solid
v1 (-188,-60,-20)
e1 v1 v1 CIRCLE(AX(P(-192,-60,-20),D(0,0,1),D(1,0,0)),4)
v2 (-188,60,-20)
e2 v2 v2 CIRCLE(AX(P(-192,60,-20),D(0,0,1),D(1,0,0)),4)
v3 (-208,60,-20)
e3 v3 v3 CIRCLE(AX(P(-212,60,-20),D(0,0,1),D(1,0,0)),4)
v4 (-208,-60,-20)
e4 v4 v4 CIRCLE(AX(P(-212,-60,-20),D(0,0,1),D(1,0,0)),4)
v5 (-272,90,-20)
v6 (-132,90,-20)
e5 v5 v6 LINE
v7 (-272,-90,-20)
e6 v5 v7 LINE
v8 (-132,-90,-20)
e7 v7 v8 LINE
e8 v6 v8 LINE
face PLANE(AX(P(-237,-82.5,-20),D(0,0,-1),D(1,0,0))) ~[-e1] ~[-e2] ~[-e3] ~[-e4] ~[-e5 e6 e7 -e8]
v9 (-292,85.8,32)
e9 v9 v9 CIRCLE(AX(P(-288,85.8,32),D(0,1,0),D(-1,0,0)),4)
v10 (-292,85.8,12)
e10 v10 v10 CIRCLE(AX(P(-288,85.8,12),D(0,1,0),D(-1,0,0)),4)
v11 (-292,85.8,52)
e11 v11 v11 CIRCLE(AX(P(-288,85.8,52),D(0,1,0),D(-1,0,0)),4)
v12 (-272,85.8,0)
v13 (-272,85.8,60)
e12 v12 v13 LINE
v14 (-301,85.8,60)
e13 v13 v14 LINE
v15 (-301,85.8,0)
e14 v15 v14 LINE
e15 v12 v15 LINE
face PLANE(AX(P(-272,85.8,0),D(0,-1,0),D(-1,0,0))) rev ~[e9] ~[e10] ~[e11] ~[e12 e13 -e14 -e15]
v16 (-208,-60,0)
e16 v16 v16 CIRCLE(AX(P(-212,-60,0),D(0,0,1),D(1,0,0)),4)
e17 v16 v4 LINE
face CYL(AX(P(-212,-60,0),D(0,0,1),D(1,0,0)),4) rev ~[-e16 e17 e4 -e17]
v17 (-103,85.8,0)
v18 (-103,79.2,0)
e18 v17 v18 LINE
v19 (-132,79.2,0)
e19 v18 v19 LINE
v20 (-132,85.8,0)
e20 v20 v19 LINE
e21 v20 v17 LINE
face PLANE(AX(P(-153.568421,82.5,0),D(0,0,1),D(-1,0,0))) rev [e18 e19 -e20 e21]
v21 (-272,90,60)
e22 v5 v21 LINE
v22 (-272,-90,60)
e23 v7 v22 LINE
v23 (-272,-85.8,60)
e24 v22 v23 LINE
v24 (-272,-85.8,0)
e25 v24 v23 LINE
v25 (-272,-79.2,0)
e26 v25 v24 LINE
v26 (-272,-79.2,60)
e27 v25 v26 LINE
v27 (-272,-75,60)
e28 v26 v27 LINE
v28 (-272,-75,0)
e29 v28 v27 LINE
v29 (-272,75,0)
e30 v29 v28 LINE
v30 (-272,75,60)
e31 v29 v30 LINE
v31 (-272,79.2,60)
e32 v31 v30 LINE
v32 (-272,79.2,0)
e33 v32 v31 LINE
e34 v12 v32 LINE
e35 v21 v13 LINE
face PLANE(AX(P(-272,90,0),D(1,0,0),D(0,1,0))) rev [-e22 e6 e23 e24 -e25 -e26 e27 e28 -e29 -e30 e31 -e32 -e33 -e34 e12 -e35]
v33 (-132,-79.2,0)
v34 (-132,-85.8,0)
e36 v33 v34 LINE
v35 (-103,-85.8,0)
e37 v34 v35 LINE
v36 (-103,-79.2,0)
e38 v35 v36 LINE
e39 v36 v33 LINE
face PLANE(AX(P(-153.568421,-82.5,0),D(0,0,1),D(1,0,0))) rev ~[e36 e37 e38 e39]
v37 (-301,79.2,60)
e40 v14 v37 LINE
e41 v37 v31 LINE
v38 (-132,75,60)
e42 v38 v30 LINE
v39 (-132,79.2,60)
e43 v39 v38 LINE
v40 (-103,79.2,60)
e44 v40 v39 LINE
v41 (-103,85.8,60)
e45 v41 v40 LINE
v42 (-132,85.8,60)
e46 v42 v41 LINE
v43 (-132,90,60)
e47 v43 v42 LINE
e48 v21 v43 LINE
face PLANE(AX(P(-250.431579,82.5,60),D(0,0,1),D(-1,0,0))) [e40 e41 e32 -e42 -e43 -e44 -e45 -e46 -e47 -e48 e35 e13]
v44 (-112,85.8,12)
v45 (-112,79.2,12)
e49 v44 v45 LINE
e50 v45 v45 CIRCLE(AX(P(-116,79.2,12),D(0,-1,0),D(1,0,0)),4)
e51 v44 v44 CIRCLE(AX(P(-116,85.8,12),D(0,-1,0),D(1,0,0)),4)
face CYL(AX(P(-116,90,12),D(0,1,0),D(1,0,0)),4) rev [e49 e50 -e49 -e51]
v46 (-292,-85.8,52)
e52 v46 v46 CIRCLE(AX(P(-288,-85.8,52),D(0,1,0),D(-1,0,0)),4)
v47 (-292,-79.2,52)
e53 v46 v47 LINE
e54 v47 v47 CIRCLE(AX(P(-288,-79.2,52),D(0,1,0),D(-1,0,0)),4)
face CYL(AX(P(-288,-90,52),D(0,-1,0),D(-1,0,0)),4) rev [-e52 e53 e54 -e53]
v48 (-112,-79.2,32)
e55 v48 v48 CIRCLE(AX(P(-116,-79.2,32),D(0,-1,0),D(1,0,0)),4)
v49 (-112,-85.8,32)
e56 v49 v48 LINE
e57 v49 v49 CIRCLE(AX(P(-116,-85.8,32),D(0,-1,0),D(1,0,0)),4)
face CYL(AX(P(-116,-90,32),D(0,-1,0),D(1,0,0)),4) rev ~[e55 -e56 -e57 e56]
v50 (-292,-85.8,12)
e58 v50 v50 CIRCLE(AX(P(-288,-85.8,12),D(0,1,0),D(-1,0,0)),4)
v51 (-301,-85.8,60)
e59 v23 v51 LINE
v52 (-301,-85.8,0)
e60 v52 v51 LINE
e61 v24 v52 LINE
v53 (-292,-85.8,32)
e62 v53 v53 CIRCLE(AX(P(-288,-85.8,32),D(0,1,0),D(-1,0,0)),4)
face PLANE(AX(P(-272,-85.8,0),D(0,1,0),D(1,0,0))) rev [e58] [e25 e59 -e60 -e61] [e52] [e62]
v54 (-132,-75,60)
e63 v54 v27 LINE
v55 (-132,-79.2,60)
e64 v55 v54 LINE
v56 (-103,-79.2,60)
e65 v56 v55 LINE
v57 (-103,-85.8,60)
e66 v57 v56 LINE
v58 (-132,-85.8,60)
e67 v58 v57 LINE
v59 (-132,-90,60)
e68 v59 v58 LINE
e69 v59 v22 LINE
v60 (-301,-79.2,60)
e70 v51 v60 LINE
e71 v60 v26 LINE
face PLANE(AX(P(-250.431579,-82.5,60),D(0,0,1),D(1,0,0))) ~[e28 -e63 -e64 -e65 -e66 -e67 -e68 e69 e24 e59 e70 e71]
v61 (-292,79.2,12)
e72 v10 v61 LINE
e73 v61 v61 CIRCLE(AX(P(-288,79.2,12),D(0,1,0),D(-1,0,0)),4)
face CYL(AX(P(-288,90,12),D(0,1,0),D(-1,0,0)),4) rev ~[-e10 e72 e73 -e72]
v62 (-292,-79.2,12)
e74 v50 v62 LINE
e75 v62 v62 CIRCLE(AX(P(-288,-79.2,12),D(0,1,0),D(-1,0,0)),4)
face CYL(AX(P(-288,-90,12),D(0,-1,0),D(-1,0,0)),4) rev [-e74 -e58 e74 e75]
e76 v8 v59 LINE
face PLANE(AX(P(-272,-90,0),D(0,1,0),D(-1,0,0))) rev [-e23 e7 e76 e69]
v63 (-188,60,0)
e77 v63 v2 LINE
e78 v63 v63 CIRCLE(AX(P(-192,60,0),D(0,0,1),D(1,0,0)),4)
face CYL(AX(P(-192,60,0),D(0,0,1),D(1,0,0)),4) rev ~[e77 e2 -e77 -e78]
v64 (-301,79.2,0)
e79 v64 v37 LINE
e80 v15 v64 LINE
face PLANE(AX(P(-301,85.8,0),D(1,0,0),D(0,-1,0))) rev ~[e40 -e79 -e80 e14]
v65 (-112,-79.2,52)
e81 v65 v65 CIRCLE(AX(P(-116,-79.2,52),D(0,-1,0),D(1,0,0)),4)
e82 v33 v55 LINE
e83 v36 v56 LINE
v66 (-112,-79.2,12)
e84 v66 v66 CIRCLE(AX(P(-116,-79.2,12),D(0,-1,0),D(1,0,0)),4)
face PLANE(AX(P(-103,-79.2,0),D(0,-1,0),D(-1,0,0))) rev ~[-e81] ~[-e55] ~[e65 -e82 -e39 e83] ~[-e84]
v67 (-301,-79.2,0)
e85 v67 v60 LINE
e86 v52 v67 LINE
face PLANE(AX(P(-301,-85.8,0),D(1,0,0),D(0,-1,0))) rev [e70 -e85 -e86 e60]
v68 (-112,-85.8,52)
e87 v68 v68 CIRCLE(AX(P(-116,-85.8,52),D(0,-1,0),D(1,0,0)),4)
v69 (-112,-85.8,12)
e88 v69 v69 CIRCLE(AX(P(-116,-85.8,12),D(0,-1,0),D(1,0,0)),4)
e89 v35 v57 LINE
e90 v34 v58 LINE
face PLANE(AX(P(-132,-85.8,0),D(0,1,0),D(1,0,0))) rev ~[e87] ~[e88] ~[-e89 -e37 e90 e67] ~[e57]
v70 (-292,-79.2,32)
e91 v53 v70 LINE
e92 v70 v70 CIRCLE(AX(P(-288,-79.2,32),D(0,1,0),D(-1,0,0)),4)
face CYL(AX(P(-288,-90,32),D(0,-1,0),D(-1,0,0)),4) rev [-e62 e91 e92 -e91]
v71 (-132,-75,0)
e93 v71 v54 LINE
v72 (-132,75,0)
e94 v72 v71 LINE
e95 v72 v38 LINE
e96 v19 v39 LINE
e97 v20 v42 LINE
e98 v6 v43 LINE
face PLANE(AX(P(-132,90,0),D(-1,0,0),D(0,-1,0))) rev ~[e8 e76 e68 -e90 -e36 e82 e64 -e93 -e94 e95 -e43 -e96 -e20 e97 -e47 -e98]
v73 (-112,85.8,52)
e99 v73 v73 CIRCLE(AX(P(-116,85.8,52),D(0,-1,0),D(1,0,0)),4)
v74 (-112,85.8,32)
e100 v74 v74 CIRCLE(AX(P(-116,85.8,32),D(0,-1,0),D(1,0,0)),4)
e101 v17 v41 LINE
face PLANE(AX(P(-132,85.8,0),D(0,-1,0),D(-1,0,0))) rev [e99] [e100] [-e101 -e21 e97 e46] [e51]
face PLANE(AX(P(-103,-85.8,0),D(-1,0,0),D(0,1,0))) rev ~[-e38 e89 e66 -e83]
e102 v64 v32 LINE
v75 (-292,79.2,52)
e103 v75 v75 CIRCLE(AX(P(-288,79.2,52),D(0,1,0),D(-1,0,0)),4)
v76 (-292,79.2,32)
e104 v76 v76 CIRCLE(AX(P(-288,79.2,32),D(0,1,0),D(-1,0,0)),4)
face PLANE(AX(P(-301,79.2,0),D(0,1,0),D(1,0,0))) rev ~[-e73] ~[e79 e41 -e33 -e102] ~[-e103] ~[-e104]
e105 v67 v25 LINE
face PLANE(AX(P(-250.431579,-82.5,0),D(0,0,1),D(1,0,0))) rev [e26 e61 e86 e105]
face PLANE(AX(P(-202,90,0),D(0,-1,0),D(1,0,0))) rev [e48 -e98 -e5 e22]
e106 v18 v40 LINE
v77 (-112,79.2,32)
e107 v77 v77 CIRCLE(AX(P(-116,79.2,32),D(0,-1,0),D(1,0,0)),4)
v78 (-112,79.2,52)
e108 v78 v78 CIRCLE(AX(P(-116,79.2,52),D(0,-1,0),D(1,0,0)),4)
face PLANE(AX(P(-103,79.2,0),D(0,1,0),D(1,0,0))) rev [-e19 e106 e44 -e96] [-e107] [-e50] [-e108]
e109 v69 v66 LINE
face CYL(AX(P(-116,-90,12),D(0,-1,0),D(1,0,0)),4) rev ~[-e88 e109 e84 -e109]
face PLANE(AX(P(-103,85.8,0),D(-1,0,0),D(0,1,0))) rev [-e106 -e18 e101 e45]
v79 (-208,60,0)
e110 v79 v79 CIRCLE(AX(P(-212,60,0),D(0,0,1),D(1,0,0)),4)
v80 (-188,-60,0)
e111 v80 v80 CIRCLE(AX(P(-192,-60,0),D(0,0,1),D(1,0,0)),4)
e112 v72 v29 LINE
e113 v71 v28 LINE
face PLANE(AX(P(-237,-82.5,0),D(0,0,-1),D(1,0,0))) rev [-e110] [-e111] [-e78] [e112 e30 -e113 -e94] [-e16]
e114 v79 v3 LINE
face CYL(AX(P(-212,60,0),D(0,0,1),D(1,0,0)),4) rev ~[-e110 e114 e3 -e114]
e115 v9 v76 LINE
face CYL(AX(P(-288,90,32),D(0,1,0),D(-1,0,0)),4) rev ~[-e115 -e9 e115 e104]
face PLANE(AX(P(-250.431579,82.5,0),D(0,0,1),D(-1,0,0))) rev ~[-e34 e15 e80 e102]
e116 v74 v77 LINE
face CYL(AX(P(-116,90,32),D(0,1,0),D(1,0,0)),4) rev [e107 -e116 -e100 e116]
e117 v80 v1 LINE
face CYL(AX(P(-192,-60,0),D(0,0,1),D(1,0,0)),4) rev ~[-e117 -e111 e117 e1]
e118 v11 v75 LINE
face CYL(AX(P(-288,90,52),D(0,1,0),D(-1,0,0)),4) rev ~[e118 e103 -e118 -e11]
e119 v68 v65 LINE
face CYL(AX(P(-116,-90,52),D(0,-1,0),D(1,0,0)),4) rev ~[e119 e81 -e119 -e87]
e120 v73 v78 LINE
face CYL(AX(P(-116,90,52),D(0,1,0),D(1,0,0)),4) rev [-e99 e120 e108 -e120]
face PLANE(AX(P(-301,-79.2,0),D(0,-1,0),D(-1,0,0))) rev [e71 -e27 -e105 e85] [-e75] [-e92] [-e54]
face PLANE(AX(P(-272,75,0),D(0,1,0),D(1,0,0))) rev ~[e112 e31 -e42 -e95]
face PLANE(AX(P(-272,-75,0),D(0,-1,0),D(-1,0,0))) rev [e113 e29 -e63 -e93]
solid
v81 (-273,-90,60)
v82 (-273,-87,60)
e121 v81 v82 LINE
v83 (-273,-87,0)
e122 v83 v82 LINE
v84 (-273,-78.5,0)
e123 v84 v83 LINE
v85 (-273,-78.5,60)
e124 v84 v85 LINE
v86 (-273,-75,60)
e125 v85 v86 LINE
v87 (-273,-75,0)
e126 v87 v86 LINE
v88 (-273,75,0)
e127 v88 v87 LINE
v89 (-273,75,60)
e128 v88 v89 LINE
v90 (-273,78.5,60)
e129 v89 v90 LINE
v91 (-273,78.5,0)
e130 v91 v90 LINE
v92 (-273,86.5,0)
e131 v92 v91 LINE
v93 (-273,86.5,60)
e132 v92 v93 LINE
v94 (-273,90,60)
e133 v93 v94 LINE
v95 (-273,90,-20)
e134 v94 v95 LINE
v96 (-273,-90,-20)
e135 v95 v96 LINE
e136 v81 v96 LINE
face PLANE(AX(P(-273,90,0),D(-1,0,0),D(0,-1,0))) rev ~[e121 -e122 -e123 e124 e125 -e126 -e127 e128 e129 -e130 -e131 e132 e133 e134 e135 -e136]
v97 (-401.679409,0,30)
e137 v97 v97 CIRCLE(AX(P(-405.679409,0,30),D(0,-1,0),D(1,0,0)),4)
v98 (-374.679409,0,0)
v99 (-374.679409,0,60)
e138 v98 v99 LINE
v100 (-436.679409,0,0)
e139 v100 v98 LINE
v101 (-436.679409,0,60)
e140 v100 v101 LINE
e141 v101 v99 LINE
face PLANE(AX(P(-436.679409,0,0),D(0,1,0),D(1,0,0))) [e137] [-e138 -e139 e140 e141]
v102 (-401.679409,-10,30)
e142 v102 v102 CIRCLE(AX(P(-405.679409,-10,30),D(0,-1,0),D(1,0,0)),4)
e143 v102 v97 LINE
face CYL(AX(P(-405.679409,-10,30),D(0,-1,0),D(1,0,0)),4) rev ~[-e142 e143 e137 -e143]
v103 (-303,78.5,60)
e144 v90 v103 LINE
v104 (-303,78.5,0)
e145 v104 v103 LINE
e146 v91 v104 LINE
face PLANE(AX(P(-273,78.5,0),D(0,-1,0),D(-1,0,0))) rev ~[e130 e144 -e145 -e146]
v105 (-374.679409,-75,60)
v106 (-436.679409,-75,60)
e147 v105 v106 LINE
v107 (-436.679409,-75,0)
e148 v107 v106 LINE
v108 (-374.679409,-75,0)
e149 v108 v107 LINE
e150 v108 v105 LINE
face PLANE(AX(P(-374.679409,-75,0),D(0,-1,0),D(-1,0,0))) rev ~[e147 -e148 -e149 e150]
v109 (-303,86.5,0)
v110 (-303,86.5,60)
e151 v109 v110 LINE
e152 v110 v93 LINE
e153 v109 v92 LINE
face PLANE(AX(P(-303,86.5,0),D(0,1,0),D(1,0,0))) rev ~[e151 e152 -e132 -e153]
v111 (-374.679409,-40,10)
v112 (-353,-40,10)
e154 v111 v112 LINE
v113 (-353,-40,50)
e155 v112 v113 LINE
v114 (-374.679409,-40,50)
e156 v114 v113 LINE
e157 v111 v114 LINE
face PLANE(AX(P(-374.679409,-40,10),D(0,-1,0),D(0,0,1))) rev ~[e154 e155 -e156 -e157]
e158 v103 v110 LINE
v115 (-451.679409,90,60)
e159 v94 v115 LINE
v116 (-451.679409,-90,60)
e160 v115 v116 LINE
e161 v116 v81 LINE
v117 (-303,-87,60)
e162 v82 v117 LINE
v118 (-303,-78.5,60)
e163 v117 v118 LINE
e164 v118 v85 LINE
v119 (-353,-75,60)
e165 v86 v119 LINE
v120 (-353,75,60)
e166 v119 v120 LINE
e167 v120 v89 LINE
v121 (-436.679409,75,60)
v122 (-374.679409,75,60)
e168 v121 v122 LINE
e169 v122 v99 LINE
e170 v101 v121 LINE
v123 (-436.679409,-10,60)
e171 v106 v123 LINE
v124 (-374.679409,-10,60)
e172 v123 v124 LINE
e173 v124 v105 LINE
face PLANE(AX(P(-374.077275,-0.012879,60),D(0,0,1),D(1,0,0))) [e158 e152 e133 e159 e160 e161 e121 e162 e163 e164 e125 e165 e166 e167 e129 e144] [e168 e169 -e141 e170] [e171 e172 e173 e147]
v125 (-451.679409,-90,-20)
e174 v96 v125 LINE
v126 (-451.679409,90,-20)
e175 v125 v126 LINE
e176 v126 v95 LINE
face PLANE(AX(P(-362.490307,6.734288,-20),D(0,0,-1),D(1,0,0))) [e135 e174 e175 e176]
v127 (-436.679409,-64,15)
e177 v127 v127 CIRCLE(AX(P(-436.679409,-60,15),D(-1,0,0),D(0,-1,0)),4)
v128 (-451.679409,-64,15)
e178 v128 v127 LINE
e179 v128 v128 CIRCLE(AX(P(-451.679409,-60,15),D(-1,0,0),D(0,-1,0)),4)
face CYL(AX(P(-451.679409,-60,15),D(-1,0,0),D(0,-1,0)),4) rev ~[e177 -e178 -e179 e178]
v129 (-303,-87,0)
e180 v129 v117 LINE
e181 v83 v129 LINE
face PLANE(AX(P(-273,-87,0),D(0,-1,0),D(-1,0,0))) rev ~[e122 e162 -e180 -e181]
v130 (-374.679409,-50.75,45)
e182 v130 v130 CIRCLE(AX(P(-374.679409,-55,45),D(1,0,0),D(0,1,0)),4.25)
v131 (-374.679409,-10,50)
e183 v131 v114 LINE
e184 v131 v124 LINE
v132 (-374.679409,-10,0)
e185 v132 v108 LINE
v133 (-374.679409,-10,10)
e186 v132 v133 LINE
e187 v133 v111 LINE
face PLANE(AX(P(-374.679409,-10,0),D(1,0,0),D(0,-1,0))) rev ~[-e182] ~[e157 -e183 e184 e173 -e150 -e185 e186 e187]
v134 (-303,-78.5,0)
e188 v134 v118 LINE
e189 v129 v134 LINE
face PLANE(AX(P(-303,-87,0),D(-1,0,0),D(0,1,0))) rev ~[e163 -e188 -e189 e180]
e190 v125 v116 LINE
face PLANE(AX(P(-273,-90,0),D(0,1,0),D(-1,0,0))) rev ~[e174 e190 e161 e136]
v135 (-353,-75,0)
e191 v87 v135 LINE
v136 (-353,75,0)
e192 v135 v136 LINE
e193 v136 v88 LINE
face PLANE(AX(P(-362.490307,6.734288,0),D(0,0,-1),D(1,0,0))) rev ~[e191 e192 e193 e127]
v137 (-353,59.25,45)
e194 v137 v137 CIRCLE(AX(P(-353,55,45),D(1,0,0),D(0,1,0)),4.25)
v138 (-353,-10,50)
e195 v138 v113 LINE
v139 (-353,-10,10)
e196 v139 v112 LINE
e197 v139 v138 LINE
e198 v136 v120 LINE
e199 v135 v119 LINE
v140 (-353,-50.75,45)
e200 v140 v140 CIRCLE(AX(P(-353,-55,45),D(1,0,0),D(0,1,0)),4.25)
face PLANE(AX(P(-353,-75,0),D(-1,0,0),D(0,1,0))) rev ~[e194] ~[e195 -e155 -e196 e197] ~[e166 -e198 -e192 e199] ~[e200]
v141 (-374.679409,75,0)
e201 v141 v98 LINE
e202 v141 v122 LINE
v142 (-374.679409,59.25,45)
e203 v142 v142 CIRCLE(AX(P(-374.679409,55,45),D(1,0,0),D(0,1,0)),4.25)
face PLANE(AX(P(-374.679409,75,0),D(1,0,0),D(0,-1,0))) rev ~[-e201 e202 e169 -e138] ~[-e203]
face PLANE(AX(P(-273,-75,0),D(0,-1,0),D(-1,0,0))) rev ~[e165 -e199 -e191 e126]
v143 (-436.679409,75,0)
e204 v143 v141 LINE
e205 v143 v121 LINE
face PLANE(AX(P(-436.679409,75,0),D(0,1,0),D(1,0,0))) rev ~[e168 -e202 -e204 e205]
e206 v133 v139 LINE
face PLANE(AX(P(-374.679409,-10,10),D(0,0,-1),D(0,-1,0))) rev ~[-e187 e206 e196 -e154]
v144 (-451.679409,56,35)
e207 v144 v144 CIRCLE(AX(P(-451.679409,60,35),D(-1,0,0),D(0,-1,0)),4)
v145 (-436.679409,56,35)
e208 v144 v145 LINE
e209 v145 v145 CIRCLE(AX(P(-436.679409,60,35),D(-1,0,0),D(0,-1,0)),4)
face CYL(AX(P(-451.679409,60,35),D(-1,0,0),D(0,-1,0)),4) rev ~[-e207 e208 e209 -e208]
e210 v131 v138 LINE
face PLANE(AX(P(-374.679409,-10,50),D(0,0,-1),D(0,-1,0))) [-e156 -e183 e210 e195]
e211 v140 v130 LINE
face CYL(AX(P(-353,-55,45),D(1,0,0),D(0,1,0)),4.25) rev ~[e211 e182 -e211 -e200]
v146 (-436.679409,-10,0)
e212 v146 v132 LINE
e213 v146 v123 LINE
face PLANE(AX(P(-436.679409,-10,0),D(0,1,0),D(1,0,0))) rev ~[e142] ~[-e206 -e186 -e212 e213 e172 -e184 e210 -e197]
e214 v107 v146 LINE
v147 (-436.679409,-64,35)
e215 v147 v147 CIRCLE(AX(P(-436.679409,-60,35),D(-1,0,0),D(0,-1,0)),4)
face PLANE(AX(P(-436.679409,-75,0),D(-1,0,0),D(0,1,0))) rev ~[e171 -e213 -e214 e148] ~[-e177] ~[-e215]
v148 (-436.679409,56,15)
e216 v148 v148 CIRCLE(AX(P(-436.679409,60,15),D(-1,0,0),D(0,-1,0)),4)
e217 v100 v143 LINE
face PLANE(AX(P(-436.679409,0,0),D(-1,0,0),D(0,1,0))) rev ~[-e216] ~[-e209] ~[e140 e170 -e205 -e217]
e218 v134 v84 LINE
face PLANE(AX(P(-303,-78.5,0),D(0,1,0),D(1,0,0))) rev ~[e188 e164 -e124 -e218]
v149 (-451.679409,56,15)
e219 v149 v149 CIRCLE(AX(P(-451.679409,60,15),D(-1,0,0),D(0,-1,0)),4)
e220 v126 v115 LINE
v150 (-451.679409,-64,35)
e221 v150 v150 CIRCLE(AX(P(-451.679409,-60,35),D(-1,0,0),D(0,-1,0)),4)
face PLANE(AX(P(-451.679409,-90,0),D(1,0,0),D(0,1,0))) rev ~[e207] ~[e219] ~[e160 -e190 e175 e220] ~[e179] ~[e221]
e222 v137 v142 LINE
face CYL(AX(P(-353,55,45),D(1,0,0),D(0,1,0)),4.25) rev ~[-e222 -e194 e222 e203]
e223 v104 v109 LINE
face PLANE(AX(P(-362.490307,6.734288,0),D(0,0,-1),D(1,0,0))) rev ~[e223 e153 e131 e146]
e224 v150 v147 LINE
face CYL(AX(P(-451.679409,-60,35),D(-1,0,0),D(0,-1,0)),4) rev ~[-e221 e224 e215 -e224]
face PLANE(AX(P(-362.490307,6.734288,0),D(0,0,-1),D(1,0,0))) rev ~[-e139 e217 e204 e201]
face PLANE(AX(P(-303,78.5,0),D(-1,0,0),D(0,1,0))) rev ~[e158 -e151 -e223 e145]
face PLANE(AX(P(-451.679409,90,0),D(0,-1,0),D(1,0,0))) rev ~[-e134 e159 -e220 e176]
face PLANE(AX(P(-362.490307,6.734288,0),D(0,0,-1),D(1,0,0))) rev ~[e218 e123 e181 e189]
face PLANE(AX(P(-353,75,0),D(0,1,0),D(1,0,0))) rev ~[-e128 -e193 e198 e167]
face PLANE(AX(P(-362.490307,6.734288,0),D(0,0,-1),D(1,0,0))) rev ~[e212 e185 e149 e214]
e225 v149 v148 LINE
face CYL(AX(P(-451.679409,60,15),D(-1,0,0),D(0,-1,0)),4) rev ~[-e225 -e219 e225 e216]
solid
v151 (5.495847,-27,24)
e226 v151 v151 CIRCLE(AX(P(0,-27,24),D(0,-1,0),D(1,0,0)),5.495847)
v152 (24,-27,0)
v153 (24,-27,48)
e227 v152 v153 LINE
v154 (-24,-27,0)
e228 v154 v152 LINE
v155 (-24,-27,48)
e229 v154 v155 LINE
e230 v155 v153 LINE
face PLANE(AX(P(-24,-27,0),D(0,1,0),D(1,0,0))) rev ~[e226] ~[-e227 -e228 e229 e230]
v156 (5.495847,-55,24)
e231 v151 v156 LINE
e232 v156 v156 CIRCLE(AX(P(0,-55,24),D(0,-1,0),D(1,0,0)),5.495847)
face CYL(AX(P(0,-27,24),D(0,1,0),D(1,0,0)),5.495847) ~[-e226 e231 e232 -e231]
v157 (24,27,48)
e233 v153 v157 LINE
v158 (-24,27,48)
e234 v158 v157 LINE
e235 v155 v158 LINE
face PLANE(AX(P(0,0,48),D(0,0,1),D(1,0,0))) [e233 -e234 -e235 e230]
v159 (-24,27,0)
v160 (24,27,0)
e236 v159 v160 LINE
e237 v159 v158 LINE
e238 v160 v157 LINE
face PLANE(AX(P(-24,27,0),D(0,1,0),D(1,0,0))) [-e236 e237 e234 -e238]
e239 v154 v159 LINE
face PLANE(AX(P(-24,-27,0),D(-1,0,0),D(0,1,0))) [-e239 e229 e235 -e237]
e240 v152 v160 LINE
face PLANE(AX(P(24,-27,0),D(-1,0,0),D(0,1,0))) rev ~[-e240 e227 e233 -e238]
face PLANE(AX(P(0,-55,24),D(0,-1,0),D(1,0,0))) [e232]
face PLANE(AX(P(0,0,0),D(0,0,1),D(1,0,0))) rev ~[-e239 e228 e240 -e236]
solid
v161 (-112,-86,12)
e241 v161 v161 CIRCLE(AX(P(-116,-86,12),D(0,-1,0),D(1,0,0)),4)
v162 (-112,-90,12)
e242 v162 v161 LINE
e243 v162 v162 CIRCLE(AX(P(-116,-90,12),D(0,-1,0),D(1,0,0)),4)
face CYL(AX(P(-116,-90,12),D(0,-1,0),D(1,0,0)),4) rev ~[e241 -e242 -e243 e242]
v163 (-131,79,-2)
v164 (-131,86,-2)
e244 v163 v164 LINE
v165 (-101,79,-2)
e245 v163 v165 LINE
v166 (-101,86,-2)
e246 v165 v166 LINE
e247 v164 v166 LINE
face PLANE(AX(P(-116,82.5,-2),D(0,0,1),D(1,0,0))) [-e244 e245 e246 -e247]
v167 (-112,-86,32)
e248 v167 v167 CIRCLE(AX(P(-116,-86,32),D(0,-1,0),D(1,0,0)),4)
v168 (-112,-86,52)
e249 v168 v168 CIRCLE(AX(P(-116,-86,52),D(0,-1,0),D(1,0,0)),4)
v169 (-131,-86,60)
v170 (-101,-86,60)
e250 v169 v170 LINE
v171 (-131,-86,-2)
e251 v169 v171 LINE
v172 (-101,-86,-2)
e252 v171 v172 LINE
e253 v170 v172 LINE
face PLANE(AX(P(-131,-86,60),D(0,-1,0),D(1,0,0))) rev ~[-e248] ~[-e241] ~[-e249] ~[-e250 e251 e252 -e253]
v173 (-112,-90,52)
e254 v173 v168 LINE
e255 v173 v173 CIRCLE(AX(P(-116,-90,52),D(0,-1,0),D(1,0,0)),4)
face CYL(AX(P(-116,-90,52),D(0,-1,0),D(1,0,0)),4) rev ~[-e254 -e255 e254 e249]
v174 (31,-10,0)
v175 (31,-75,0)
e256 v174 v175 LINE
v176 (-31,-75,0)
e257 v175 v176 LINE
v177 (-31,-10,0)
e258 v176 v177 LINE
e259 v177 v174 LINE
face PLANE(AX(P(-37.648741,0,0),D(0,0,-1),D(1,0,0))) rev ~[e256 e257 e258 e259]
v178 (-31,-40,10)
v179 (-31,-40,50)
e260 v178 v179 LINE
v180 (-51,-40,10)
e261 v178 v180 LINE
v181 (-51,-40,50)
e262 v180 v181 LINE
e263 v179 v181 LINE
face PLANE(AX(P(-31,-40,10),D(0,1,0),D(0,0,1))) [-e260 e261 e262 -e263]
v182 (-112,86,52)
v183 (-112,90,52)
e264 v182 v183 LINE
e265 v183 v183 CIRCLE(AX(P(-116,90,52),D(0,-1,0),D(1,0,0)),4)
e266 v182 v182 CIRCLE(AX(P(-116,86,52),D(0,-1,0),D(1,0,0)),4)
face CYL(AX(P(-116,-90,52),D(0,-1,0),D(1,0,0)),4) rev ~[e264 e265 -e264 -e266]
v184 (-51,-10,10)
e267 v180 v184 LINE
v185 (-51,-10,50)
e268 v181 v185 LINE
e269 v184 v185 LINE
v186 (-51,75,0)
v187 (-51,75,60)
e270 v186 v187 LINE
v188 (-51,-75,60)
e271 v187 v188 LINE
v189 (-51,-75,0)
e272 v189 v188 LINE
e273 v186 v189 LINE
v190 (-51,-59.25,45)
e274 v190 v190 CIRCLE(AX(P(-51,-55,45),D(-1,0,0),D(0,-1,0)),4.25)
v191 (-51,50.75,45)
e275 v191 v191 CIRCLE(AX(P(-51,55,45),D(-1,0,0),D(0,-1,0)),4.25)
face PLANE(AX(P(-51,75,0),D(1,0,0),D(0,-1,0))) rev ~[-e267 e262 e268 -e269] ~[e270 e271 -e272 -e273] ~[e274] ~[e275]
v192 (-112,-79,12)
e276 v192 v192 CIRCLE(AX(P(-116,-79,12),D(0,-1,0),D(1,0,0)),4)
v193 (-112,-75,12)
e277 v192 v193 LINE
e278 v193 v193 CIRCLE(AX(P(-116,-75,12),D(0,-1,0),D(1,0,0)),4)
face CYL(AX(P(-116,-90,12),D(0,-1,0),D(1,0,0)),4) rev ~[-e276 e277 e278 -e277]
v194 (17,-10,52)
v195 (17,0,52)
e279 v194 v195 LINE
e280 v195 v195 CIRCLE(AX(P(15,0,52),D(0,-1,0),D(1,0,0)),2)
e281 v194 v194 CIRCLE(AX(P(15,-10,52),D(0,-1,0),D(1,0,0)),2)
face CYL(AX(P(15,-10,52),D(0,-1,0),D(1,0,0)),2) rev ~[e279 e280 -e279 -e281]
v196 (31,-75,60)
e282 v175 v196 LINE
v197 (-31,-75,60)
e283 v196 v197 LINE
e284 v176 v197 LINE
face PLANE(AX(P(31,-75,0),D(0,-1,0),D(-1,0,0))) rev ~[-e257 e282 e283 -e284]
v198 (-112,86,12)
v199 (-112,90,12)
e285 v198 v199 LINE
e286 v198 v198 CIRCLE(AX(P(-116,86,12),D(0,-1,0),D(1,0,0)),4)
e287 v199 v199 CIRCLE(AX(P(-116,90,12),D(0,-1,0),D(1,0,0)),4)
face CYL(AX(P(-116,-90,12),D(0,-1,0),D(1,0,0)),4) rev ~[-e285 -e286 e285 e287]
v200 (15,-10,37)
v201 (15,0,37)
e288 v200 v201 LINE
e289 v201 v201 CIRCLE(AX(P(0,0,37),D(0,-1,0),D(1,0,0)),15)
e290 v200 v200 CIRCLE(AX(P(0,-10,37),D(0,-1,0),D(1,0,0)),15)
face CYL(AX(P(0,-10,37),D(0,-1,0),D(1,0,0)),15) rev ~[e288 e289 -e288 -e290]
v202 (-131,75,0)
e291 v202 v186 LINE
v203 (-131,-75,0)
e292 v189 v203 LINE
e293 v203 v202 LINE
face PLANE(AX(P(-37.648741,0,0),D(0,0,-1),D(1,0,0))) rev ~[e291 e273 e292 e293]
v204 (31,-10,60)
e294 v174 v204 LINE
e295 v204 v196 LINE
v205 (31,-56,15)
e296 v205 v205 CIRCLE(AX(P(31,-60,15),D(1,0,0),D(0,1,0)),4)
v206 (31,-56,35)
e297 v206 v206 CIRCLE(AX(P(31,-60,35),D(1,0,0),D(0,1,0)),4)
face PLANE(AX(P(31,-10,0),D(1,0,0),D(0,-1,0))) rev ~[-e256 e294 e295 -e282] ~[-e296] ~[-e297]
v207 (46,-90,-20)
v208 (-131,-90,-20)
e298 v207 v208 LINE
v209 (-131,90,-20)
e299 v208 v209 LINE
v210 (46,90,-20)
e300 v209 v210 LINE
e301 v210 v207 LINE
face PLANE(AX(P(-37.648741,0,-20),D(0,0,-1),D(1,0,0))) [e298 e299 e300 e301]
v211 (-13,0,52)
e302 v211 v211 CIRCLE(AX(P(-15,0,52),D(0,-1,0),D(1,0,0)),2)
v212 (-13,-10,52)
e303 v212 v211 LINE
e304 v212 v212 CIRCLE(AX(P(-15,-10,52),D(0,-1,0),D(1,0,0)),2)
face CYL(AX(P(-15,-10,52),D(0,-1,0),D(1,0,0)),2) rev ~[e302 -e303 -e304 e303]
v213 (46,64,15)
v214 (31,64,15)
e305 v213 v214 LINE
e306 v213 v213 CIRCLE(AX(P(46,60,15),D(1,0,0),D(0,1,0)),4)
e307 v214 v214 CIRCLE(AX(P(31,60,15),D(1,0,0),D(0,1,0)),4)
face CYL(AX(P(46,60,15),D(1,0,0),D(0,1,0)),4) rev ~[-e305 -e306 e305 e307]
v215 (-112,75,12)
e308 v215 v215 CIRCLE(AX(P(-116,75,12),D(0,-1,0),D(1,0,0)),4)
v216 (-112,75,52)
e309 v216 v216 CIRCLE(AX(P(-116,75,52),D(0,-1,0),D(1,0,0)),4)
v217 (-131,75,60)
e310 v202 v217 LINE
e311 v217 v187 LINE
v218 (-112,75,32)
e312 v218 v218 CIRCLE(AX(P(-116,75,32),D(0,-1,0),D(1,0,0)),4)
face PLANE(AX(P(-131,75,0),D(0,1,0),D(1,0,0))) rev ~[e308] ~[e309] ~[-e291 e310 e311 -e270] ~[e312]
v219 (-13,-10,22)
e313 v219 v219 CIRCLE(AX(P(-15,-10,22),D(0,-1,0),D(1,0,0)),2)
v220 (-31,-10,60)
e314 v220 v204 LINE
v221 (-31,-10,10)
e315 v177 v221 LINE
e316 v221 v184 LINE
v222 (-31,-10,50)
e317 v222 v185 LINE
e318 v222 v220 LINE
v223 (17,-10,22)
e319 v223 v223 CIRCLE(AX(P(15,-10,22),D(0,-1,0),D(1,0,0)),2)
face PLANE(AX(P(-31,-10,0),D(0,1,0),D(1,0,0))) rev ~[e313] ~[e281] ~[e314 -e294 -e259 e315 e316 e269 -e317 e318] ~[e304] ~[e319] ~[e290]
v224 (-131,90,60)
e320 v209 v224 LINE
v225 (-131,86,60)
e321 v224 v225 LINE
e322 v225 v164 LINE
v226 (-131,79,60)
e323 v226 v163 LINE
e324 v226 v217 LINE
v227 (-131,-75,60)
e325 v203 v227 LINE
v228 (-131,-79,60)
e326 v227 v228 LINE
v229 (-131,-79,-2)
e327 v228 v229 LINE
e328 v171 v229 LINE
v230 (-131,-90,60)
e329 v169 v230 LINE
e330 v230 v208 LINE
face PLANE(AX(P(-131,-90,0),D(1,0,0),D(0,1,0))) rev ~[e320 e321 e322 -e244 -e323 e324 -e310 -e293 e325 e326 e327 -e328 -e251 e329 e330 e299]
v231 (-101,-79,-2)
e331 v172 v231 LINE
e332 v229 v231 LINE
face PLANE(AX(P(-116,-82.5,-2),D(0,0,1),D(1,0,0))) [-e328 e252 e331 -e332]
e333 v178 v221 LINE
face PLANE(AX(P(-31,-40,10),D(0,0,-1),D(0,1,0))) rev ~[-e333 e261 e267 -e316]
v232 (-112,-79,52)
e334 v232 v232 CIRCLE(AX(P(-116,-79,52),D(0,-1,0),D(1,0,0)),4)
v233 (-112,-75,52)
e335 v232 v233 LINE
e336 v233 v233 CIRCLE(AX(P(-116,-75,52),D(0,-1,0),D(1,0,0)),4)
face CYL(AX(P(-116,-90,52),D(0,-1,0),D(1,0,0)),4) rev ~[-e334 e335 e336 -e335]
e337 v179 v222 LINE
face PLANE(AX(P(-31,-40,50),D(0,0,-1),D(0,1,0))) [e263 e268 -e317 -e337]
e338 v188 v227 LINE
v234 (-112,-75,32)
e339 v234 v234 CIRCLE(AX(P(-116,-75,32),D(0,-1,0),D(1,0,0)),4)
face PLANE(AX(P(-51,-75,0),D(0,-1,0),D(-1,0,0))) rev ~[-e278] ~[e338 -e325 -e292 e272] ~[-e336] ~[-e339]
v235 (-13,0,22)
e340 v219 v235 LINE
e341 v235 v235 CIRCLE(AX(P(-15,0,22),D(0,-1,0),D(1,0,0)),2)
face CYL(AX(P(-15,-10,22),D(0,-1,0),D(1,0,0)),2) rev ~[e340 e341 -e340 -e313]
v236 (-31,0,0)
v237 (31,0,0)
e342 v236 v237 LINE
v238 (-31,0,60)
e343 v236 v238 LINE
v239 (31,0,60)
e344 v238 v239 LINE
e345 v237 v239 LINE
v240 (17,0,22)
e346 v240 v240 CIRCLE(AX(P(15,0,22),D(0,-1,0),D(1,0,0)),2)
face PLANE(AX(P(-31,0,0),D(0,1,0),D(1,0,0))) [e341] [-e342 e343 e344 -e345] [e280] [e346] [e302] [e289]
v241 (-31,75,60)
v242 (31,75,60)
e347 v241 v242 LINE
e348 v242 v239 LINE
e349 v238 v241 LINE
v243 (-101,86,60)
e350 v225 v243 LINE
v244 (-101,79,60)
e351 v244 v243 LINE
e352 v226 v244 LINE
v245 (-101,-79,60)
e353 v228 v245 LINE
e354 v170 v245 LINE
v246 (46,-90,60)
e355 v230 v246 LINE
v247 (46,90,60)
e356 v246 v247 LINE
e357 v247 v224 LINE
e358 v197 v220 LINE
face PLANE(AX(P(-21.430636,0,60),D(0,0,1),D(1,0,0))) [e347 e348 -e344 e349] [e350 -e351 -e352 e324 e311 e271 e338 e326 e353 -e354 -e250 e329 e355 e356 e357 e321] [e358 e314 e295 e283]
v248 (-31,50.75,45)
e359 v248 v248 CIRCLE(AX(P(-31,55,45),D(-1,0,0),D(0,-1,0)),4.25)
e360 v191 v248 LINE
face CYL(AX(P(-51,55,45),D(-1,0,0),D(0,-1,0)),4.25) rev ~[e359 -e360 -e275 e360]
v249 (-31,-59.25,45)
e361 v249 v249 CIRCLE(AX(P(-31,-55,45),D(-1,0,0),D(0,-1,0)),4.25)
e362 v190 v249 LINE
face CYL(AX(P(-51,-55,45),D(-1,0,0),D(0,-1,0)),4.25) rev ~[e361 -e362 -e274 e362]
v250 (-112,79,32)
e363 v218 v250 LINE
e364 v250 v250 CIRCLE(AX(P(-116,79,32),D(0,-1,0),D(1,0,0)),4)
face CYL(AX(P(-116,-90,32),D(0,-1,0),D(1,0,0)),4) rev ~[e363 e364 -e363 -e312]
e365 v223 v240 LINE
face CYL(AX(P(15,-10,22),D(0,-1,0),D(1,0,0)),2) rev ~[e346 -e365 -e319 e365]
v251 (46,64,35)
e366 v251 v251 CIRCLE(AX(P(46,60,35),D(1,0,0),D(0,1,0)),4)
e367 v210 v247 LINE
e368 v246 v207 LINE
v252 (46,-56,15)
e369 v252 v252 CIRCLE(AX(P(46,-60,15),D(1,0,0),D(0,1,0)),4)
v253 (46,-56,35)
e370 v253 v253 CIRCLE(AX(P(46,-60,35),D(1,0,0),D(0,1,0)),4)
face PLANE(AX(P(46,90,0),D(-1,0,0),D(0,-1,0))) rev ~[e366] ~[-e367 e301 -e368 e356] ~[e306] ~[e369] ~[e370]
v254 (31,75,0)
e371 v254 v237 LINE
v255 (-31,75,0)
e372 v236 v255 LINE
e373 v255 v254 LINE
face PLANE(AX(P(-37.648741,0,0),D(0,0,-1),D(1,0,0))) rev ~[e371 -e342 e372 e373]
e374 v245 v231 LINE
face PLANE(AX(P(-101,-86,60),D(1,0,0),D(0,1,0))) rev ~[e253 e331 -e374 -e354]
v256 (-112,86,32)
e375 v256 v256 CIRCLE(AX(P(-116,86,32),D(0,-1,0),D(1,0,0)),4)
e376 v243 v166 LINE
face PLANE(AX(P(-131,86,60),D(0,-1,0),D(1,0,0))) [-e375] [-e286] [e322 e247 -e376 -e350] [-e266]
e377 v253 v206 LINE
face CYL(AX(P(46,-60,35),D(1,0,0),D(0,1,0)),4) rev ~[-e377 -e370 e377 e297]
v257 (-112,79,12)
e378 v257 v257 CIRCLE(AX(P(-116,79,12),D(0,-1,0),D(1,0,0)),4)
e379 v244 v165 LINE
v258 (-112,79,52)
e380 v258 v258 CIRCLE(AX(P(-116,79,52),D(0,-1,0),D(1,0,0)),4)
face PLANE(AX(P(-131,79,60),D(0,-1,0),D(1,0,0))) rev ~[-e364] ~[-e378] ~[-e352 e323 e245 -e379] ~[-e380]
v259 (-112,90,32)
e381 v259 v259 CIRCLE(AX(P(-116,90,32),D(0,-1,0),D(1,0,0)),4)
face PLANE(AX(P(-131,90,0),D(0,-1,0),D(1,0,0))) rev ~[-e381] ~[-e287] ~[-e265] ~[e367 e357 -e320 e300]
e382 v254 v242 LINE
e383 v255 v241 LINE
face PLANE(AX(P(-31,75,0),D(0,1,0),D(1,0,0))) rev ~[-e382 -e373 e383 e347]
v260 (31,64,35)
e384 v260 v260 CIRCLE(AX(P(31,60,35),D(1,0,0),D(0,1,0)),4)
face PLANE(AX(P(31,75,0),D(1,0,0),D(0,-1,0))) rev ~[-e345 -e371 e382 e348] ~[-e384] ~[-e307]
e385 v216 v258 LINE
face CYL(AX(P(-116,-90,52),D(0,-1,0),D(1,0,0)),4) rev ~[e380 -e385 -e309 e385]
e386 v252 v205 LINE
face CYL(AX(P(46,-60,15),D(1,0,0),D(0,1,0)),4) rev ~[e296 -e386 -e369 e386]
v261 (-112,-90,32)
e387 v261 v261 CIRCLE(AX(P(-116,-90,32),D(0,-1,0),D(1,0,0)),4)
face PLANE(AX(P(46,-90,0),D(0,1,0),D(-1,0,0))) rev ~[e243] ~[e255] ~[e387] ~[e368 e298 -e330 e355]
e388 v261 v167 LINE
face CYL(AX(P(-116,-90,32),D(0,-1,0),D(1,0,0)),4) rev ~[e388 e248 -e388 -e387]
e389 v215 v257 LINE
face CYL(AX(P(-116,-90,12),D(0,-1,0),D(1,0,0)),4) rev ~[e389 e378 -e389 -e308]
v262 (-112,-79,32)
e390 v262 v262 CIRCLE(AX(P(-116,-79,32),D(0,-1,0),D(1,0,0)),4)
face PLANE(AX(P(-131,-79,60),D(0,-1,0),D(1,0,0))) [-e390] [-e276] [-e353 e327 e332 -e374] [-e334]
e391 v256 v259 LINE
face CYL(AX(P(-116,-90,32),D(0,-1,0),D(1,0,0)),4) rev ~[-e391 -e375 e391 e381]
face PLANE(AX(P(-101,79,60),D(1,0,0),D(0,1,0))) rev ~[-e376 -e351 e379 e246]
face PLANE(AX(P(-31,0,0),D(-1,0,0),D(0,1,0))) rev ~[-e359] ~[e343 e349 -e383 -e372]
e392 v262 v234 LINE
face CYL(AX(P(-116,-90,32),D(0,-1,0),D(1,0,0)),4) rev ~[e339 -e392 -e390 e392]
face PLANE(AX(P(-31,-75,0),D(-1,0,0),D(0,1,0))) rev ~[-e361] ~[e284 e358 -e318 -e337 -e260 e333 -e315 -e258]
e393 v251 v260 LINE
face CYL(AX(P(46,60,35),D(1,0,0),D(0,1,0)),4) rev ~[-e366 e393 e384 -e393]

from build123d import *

# Parameters (mm, degrees)
F0_W           = 48
F0_H           = 54
F1_DEPTH       = 48
F2_R           = 5.4958473914
F3_DEPTH       = 28
F4_W           = 62
F4_H           = 10
F5_DEPTH       = 60
F6_W           = 62
F6_H           = 75
F6_H_2         = 65
F6_W_2         = 80
F6_H_3         = 150
F7_DEPTH       = 20
F8_W           = 30
F8_H           = 40
F9_DEPTH       = 25
F10_R          = 2
F10_R_2        = 15
F11_DEPTH      = 25
F11_DEPTH_BACK = 25
F13_R          = 4
F15_DEPTH      = 25
F17_DEPTH      = 60
F14_W          = 30
F14_H          = 7
F18_DEPTH      = 62
F12_R          = 4
F19_DEPTH      = 300
F21_W          = 70
F21_H          = 165
F22_DEPTH      = 20
F24_W          = 62
F24_H          = 10
F25_DEPTH      = 60
F26_W          = 62
F26_H          = 75
F26_H_2        = 65
F26_W_2        = 80
F26_H_3        = 150
F26_W_3        = 30
F26_H_4        = 8.5
F26_H_5        = 8
F27_DEPTH      = 20
F28_R          = 4
F29_DEPTH      = 25
F30_W          = 30
F30_H          = 40
F31_DEPTH      = 25
F32_R          = 4
F33_DEPTH      = 25
F34_R          = 4.25
F35_DEPTH      = 25
F36_R          = 4.25
F37_DEPTH      = 25
F38_R          = 4
F39_DEPTH      = 25


# Not quite as in the source:
# - a feature names something its author has since deleted; it is built from what else it names


with BuildPart() as f1:
    # F0 (on Top) → F1 (new body)
    with BuildSketch(Plane.XY):
        Rectangle(F0_W, F0_H)
    extrude(amount=F1_DEPTH)

    # F2 (on face) → F3 (join)
    with BuildSketch(Plane.XZ.offset(27)):
        with Locations((0, 24)):
            Circle(F2_R)
    extrude(amount=F3_DEPTH)


with BuildPart() as f5:
    # F4 (on Top) → F5 (new body)
    with BuildSketch(Plane.XY):
        Polygon((31, -10), (31, -75), (-31, -75), (-51, -75), (-131, -75), (-131, -90), (46, -90), (46, 90), (-131, 90), (-131, 75), (-51, 75), (-31, 75), (31, 75), (31, 0), align=None)
        Polygon((-51, -75), (-31, -75), (-31, -10), (-31, 0), (-31, 75), (-51, 75), (-51, 74.3744149804), align=None)
        with Locations((0, -5)):
            Rectangle(F4_W, F4_H)
    extrude(amount=F5_DEPTH)

    # F6 (on face) → F7 (join)
    with BuildSketch(Plane(origin=(0, 0, 0), x_dir=(1, 0, 0), z_dir=(0, 0, -1))):
        Polygon((46, -90), (46, 90), (-131, 90), (-131, 75), (-51, 75), (-51, -75), (-131, -75), (-131, -90), align=None)
        with Locations((0, -37.5)):
            Rectangle(F6_W, F6_H, mode=Mode.SUBTRACT)
        with Locations((0, 42.5)):
            Rectangle(F6_W, F6_H_2, mode=Mode.SUBTRACT)
        with Locations((-91, 0)):
            Rectangle(F6_W_2, F6_H_3)
        with Locations((0, -37.5)):
            Rectangle(F6_W, F6_H)
        with Locations((0, 42.5)):
            Rectangle(F6_W, F6_H_2)
    extrude(amount=F7_DEPTH)

    # F8 (on face) → F9 (cut)
    with BuildSketch(Plane.YZ.offset(-31)):
        with Locations((-25, 30)):
            Rectangle(F8_W, F8_H)
    extrude(amount=-F9_DEPTH, mode=Mode.SUBTRACT)

    # F10 (on face) → F11 (cut, two sides)
    with BuildSketch(Plane.XZ.offset(10)) as f11_sk:
        with Locations((-15, 52)):
            Circle(F10_R)
        with Locations((15, 52)):
            Circle(F10_R)
        with Locations((-15, 22)):
            Circle(F10_R)
        with Locations((15, 22)):
            Circle(F10_R)
        with Locations((0, 37)):
            Circle(F10_R_2)
    extrude(amount=-F11_DEPTH, mode=Mode.SUBTRACT)
    extrude(f11_sk.sketch, amount=F11_DEPTH_BACK, mode=Mode.SUBTRACT)

    # F13 (on face) → F15 (cut)
    with BuildSketch(Plane.YZ.offset(46)):
        with Locations((-60, 15)):
            Circle(F13_R)
        with Locations((-60, 35)):
            Circle(F13_R)
        with Locations((60, 35)):
            Circle(F13_R)
        with Locations((60, 15)):
            Circle(F13_R)
    extrude(amount=-F15_DEPTH, mode=Mode.SUBTRACT)

    # F14 (on face) → F18 (cut)
    with BuildSketch(Plane.XY.offset(60)):
        with Locations((-116, -82.5)):
            Rectangle(F14_W, F14_H)
        with Locations((-116, 82.5)):
            Rectangle(F14_W, F14_H)
    extrude(amount=-F18_DEPTH, mode=Mode.SUBTRACT)


with BuildPart() as f17:
    # F16 (on Top) → F17 (new body)
    with BuildSketch(Plane.XY):
        Polygon((-202, -90), (-132, -90), (-132, -85.8), (-103, -85.8), (-103, -79.2), (-132, -79.2), (-132, -75), (-202, -75), align=None)
    extrude(amount=F17_DEPTH)


with BuildPart() as f19_tool:
    # F12 (on face) → F19 (new body)
    with BuildSketch(Plane.XZ.offset(90)):
        with Locations((-116, 12)):
            Circle(F12_R)
        with Locations((-116, 32)):
            Circle(F12_R)
        with Locations((-116, 52)):
            Circle(F12_R)
    extrude(amount=-F19_DEPTH)


with BuildPart() as f5_1:
    add(f5.part)

    # F19: cut by f19_tool
    add(f19_tool.part, mode=Mode.SUBTRACT)

    # F36 (on face) → F37 (cut)
    with BuildSketch(Plane(origin=(-51, 0, 0), x_dir=(0, -1, 0), z_dir=(-1, 0, 0))):
        with Locations((55, 45)):
            Circle(F36_R)
        with Locations((-55, 45)):
            Circle(F36_R)
    extrude(amount=-F37_DEPTH, mode=Mode.SUBTRACT)


with BuildPart() as f17_1:
    add(f17.part)

    # F19: cut by f19_tool
    add(f19_tool.part, mode=Mode.SUBTRACT)


with BuildPart() as f20_1:
    # F20: instance of F17
    add(f17_1.part.mirror(Plane.XZ))


with BuildPart() as f17_2:
    add(f17_1.part)

    add(f20_1.part)  # F22 merges F20_1
    # F21 (on face) → F22 (join)
    with BuildSketch(Plane(origin=(0, 0, 0), x_dir=(1, 0, 0), z_dir=(0, 0, -1))):
        Polygon((-132, 90), (-202, 90), (-202, 75), (-132, 75), (-132, 79.2), (-132, 85.8), align=None)
        with Locations((-167, -7.5)):
            Rectangle(F21_W, F21_H)
    extrude(amount=F22_DEPTH)

    # F23: F17 across face


with BuildPart() as f17_3:
    add(f17_2.part)
    add(f17_2.part.mirror(Plane(origin=(-202, 0, 3.3333333333), x_dir=(0, -1, 0), z_dir=(-1, 0, 0))))

    # F38 (on face) → F39 (cut)
    with BuildSketch(Plane.XY):
        with Locations((-212, 60)):
            Circle(F38_R)
        with Locations((-192, -60)):
            Circle(F38_R)
        with Locations((-212, -60)):
            Circle(F38_R)
        with Locations((-192, 60)):
            Circle(F38_R)
    extrude(amount=-F39_DEPTH, mode=Mode.SUBTRACT)


with BuildPart() as f25:
    # F24 (on Top) → F25 (new body)
    with BuildSketch(Plane.XY):
        Polygon((-353, -90), (-273, -90), (-273, -87), (-303, -87), (-303, -78.5), (-273, -78.5), (-273, -75), (-353, -75), (-374.6794085503, -75), (-436.6794085503, -75), (-436.6794085503, -10), (-436.6794085503, 0), (-436.6794085503, 75), (-374.6794085503, 75), (-353, 75), (-273, 75), (-273, 78.5), (-303, 78.5), (-303, 86.5), (-273, 86.5), (-273, 90), (-353, 90), (-374.6794085503, 90), (-436.6794085503, 90), (-451.6794085503, 90), (-451.6794085503, -90), (-436.6794085503, -90), (-374.6794085503, -90), align=None)
        Polygon((-374.6794085503, -75), (-353, -75), (-353, 75), (-374.6794085503, 75), (-374.6794085503, 0), (-374.6794085503, -10), align=None)
        with Locations((-405.6794085503, -5)):
            Rectangle(F24_W, F24_H)
    extrude(amount=F25_DEPTH)

    # F26 (on face) → F27 (join)
    with BuildSketch(Plane(origin=(0, 0, 0), x_dir=(1, 0, 0), z_dir=(0, 0, -1))):
        Polygon((-451.6794085503, 87), (-451.6794085503, -90), (-273, -90), (-273, -86.5), (-303, -86.5), (-303, -78.5), (-273, -78.5), (-273, -75), (-353, -75), (-353, 75), (-273, 75), (-273, 78.5), (-303, 78.5), (-303, 87), align=None)
        with Locations((-405.6794085503, -37.5)):
            Rectangle(F26_W, F26_H, mode=Mode.SUBTRACT)
        with Locations((-405.6794085503, 42.5)):
            Rectangle(F26_W, F26_H_2, mode=Mode.SUBTRACT)
        Polygon((-451.6794085503, 90), (-451.6794085503, 87), (-303, 87), (-273, 87), (-273, 90), align=None)
        with Locations((-405.6794085503, -37.5)):
            Rectangle(F26_W, F26_H)
        with Locations((-405.6794085503, 42.5)):
            Rectangle(F26_W, F26_H_2)
        with Locations((-313, 0)):
            Rectangle(F26_W_2, F26_H_3)
        with Locations((-288, 82.75)):
            Rectangle(F26_W_3, F26_H_4)
        with Locations((-288, -82.5)):
            Rectangle(F26_W_3, F26_H_5)
    extrude(amount=F27_DEPTH)

    # F28 (on face) → F29 (cut)
    with BuildSketch(Plane.XZ.offset(10)):
        with Locations((-405.6794085503, 30)):
            Circle(F28_R)
    extrude(amount=-F29_DEPTH, mode=Mode.SUBTRACT)

    # F30 (on face) → F31 (cut)
    with BuildSketch(Plane(origin=(-374.6794085503, 0, 0), x_dir=(0, -1, 0), z_dir=(-1, 0, 0))):
        with Locations((25, 30)):
            Rectangle(F30_W, F30_H)
    extrude(amount=-F31_DEPTH, mode=Mode.SUBTRACT)

    # F32 (on face) → F33 (cut)
    with BuildSketch(Plane(origin=(-451.6794085503, 0, 0), x_dir=(0, -1, 0), z_dir=(-1, 0, 0))):
        with Locations((60, 35)):
            Circle(F32_R)
        with Locations((60, 15)):
            Circle(F32_R)
        with Locations((-60, 35)):
            Circle(F32_R)
        with Locations((-60, 15)):
            Circle(F32_R)
    extrude(amount=-F33_DEPTH, mode=Mode.SUBTRACT)

    # F34 (on face) → F35 (cut)
    with BuildSketch(Plane.YZ.offset(-353)):
        with Locations((55, 45)):
            Circle(F34_R)
        with Locations((-55, 45)):
            Circle(F34_R)
    extrude(amount=-F35_DEPTH, mode=Mode.SUBTRACT)


solid = Compound([f1.part, f5_1.part, f17_3.part, f25.part])
